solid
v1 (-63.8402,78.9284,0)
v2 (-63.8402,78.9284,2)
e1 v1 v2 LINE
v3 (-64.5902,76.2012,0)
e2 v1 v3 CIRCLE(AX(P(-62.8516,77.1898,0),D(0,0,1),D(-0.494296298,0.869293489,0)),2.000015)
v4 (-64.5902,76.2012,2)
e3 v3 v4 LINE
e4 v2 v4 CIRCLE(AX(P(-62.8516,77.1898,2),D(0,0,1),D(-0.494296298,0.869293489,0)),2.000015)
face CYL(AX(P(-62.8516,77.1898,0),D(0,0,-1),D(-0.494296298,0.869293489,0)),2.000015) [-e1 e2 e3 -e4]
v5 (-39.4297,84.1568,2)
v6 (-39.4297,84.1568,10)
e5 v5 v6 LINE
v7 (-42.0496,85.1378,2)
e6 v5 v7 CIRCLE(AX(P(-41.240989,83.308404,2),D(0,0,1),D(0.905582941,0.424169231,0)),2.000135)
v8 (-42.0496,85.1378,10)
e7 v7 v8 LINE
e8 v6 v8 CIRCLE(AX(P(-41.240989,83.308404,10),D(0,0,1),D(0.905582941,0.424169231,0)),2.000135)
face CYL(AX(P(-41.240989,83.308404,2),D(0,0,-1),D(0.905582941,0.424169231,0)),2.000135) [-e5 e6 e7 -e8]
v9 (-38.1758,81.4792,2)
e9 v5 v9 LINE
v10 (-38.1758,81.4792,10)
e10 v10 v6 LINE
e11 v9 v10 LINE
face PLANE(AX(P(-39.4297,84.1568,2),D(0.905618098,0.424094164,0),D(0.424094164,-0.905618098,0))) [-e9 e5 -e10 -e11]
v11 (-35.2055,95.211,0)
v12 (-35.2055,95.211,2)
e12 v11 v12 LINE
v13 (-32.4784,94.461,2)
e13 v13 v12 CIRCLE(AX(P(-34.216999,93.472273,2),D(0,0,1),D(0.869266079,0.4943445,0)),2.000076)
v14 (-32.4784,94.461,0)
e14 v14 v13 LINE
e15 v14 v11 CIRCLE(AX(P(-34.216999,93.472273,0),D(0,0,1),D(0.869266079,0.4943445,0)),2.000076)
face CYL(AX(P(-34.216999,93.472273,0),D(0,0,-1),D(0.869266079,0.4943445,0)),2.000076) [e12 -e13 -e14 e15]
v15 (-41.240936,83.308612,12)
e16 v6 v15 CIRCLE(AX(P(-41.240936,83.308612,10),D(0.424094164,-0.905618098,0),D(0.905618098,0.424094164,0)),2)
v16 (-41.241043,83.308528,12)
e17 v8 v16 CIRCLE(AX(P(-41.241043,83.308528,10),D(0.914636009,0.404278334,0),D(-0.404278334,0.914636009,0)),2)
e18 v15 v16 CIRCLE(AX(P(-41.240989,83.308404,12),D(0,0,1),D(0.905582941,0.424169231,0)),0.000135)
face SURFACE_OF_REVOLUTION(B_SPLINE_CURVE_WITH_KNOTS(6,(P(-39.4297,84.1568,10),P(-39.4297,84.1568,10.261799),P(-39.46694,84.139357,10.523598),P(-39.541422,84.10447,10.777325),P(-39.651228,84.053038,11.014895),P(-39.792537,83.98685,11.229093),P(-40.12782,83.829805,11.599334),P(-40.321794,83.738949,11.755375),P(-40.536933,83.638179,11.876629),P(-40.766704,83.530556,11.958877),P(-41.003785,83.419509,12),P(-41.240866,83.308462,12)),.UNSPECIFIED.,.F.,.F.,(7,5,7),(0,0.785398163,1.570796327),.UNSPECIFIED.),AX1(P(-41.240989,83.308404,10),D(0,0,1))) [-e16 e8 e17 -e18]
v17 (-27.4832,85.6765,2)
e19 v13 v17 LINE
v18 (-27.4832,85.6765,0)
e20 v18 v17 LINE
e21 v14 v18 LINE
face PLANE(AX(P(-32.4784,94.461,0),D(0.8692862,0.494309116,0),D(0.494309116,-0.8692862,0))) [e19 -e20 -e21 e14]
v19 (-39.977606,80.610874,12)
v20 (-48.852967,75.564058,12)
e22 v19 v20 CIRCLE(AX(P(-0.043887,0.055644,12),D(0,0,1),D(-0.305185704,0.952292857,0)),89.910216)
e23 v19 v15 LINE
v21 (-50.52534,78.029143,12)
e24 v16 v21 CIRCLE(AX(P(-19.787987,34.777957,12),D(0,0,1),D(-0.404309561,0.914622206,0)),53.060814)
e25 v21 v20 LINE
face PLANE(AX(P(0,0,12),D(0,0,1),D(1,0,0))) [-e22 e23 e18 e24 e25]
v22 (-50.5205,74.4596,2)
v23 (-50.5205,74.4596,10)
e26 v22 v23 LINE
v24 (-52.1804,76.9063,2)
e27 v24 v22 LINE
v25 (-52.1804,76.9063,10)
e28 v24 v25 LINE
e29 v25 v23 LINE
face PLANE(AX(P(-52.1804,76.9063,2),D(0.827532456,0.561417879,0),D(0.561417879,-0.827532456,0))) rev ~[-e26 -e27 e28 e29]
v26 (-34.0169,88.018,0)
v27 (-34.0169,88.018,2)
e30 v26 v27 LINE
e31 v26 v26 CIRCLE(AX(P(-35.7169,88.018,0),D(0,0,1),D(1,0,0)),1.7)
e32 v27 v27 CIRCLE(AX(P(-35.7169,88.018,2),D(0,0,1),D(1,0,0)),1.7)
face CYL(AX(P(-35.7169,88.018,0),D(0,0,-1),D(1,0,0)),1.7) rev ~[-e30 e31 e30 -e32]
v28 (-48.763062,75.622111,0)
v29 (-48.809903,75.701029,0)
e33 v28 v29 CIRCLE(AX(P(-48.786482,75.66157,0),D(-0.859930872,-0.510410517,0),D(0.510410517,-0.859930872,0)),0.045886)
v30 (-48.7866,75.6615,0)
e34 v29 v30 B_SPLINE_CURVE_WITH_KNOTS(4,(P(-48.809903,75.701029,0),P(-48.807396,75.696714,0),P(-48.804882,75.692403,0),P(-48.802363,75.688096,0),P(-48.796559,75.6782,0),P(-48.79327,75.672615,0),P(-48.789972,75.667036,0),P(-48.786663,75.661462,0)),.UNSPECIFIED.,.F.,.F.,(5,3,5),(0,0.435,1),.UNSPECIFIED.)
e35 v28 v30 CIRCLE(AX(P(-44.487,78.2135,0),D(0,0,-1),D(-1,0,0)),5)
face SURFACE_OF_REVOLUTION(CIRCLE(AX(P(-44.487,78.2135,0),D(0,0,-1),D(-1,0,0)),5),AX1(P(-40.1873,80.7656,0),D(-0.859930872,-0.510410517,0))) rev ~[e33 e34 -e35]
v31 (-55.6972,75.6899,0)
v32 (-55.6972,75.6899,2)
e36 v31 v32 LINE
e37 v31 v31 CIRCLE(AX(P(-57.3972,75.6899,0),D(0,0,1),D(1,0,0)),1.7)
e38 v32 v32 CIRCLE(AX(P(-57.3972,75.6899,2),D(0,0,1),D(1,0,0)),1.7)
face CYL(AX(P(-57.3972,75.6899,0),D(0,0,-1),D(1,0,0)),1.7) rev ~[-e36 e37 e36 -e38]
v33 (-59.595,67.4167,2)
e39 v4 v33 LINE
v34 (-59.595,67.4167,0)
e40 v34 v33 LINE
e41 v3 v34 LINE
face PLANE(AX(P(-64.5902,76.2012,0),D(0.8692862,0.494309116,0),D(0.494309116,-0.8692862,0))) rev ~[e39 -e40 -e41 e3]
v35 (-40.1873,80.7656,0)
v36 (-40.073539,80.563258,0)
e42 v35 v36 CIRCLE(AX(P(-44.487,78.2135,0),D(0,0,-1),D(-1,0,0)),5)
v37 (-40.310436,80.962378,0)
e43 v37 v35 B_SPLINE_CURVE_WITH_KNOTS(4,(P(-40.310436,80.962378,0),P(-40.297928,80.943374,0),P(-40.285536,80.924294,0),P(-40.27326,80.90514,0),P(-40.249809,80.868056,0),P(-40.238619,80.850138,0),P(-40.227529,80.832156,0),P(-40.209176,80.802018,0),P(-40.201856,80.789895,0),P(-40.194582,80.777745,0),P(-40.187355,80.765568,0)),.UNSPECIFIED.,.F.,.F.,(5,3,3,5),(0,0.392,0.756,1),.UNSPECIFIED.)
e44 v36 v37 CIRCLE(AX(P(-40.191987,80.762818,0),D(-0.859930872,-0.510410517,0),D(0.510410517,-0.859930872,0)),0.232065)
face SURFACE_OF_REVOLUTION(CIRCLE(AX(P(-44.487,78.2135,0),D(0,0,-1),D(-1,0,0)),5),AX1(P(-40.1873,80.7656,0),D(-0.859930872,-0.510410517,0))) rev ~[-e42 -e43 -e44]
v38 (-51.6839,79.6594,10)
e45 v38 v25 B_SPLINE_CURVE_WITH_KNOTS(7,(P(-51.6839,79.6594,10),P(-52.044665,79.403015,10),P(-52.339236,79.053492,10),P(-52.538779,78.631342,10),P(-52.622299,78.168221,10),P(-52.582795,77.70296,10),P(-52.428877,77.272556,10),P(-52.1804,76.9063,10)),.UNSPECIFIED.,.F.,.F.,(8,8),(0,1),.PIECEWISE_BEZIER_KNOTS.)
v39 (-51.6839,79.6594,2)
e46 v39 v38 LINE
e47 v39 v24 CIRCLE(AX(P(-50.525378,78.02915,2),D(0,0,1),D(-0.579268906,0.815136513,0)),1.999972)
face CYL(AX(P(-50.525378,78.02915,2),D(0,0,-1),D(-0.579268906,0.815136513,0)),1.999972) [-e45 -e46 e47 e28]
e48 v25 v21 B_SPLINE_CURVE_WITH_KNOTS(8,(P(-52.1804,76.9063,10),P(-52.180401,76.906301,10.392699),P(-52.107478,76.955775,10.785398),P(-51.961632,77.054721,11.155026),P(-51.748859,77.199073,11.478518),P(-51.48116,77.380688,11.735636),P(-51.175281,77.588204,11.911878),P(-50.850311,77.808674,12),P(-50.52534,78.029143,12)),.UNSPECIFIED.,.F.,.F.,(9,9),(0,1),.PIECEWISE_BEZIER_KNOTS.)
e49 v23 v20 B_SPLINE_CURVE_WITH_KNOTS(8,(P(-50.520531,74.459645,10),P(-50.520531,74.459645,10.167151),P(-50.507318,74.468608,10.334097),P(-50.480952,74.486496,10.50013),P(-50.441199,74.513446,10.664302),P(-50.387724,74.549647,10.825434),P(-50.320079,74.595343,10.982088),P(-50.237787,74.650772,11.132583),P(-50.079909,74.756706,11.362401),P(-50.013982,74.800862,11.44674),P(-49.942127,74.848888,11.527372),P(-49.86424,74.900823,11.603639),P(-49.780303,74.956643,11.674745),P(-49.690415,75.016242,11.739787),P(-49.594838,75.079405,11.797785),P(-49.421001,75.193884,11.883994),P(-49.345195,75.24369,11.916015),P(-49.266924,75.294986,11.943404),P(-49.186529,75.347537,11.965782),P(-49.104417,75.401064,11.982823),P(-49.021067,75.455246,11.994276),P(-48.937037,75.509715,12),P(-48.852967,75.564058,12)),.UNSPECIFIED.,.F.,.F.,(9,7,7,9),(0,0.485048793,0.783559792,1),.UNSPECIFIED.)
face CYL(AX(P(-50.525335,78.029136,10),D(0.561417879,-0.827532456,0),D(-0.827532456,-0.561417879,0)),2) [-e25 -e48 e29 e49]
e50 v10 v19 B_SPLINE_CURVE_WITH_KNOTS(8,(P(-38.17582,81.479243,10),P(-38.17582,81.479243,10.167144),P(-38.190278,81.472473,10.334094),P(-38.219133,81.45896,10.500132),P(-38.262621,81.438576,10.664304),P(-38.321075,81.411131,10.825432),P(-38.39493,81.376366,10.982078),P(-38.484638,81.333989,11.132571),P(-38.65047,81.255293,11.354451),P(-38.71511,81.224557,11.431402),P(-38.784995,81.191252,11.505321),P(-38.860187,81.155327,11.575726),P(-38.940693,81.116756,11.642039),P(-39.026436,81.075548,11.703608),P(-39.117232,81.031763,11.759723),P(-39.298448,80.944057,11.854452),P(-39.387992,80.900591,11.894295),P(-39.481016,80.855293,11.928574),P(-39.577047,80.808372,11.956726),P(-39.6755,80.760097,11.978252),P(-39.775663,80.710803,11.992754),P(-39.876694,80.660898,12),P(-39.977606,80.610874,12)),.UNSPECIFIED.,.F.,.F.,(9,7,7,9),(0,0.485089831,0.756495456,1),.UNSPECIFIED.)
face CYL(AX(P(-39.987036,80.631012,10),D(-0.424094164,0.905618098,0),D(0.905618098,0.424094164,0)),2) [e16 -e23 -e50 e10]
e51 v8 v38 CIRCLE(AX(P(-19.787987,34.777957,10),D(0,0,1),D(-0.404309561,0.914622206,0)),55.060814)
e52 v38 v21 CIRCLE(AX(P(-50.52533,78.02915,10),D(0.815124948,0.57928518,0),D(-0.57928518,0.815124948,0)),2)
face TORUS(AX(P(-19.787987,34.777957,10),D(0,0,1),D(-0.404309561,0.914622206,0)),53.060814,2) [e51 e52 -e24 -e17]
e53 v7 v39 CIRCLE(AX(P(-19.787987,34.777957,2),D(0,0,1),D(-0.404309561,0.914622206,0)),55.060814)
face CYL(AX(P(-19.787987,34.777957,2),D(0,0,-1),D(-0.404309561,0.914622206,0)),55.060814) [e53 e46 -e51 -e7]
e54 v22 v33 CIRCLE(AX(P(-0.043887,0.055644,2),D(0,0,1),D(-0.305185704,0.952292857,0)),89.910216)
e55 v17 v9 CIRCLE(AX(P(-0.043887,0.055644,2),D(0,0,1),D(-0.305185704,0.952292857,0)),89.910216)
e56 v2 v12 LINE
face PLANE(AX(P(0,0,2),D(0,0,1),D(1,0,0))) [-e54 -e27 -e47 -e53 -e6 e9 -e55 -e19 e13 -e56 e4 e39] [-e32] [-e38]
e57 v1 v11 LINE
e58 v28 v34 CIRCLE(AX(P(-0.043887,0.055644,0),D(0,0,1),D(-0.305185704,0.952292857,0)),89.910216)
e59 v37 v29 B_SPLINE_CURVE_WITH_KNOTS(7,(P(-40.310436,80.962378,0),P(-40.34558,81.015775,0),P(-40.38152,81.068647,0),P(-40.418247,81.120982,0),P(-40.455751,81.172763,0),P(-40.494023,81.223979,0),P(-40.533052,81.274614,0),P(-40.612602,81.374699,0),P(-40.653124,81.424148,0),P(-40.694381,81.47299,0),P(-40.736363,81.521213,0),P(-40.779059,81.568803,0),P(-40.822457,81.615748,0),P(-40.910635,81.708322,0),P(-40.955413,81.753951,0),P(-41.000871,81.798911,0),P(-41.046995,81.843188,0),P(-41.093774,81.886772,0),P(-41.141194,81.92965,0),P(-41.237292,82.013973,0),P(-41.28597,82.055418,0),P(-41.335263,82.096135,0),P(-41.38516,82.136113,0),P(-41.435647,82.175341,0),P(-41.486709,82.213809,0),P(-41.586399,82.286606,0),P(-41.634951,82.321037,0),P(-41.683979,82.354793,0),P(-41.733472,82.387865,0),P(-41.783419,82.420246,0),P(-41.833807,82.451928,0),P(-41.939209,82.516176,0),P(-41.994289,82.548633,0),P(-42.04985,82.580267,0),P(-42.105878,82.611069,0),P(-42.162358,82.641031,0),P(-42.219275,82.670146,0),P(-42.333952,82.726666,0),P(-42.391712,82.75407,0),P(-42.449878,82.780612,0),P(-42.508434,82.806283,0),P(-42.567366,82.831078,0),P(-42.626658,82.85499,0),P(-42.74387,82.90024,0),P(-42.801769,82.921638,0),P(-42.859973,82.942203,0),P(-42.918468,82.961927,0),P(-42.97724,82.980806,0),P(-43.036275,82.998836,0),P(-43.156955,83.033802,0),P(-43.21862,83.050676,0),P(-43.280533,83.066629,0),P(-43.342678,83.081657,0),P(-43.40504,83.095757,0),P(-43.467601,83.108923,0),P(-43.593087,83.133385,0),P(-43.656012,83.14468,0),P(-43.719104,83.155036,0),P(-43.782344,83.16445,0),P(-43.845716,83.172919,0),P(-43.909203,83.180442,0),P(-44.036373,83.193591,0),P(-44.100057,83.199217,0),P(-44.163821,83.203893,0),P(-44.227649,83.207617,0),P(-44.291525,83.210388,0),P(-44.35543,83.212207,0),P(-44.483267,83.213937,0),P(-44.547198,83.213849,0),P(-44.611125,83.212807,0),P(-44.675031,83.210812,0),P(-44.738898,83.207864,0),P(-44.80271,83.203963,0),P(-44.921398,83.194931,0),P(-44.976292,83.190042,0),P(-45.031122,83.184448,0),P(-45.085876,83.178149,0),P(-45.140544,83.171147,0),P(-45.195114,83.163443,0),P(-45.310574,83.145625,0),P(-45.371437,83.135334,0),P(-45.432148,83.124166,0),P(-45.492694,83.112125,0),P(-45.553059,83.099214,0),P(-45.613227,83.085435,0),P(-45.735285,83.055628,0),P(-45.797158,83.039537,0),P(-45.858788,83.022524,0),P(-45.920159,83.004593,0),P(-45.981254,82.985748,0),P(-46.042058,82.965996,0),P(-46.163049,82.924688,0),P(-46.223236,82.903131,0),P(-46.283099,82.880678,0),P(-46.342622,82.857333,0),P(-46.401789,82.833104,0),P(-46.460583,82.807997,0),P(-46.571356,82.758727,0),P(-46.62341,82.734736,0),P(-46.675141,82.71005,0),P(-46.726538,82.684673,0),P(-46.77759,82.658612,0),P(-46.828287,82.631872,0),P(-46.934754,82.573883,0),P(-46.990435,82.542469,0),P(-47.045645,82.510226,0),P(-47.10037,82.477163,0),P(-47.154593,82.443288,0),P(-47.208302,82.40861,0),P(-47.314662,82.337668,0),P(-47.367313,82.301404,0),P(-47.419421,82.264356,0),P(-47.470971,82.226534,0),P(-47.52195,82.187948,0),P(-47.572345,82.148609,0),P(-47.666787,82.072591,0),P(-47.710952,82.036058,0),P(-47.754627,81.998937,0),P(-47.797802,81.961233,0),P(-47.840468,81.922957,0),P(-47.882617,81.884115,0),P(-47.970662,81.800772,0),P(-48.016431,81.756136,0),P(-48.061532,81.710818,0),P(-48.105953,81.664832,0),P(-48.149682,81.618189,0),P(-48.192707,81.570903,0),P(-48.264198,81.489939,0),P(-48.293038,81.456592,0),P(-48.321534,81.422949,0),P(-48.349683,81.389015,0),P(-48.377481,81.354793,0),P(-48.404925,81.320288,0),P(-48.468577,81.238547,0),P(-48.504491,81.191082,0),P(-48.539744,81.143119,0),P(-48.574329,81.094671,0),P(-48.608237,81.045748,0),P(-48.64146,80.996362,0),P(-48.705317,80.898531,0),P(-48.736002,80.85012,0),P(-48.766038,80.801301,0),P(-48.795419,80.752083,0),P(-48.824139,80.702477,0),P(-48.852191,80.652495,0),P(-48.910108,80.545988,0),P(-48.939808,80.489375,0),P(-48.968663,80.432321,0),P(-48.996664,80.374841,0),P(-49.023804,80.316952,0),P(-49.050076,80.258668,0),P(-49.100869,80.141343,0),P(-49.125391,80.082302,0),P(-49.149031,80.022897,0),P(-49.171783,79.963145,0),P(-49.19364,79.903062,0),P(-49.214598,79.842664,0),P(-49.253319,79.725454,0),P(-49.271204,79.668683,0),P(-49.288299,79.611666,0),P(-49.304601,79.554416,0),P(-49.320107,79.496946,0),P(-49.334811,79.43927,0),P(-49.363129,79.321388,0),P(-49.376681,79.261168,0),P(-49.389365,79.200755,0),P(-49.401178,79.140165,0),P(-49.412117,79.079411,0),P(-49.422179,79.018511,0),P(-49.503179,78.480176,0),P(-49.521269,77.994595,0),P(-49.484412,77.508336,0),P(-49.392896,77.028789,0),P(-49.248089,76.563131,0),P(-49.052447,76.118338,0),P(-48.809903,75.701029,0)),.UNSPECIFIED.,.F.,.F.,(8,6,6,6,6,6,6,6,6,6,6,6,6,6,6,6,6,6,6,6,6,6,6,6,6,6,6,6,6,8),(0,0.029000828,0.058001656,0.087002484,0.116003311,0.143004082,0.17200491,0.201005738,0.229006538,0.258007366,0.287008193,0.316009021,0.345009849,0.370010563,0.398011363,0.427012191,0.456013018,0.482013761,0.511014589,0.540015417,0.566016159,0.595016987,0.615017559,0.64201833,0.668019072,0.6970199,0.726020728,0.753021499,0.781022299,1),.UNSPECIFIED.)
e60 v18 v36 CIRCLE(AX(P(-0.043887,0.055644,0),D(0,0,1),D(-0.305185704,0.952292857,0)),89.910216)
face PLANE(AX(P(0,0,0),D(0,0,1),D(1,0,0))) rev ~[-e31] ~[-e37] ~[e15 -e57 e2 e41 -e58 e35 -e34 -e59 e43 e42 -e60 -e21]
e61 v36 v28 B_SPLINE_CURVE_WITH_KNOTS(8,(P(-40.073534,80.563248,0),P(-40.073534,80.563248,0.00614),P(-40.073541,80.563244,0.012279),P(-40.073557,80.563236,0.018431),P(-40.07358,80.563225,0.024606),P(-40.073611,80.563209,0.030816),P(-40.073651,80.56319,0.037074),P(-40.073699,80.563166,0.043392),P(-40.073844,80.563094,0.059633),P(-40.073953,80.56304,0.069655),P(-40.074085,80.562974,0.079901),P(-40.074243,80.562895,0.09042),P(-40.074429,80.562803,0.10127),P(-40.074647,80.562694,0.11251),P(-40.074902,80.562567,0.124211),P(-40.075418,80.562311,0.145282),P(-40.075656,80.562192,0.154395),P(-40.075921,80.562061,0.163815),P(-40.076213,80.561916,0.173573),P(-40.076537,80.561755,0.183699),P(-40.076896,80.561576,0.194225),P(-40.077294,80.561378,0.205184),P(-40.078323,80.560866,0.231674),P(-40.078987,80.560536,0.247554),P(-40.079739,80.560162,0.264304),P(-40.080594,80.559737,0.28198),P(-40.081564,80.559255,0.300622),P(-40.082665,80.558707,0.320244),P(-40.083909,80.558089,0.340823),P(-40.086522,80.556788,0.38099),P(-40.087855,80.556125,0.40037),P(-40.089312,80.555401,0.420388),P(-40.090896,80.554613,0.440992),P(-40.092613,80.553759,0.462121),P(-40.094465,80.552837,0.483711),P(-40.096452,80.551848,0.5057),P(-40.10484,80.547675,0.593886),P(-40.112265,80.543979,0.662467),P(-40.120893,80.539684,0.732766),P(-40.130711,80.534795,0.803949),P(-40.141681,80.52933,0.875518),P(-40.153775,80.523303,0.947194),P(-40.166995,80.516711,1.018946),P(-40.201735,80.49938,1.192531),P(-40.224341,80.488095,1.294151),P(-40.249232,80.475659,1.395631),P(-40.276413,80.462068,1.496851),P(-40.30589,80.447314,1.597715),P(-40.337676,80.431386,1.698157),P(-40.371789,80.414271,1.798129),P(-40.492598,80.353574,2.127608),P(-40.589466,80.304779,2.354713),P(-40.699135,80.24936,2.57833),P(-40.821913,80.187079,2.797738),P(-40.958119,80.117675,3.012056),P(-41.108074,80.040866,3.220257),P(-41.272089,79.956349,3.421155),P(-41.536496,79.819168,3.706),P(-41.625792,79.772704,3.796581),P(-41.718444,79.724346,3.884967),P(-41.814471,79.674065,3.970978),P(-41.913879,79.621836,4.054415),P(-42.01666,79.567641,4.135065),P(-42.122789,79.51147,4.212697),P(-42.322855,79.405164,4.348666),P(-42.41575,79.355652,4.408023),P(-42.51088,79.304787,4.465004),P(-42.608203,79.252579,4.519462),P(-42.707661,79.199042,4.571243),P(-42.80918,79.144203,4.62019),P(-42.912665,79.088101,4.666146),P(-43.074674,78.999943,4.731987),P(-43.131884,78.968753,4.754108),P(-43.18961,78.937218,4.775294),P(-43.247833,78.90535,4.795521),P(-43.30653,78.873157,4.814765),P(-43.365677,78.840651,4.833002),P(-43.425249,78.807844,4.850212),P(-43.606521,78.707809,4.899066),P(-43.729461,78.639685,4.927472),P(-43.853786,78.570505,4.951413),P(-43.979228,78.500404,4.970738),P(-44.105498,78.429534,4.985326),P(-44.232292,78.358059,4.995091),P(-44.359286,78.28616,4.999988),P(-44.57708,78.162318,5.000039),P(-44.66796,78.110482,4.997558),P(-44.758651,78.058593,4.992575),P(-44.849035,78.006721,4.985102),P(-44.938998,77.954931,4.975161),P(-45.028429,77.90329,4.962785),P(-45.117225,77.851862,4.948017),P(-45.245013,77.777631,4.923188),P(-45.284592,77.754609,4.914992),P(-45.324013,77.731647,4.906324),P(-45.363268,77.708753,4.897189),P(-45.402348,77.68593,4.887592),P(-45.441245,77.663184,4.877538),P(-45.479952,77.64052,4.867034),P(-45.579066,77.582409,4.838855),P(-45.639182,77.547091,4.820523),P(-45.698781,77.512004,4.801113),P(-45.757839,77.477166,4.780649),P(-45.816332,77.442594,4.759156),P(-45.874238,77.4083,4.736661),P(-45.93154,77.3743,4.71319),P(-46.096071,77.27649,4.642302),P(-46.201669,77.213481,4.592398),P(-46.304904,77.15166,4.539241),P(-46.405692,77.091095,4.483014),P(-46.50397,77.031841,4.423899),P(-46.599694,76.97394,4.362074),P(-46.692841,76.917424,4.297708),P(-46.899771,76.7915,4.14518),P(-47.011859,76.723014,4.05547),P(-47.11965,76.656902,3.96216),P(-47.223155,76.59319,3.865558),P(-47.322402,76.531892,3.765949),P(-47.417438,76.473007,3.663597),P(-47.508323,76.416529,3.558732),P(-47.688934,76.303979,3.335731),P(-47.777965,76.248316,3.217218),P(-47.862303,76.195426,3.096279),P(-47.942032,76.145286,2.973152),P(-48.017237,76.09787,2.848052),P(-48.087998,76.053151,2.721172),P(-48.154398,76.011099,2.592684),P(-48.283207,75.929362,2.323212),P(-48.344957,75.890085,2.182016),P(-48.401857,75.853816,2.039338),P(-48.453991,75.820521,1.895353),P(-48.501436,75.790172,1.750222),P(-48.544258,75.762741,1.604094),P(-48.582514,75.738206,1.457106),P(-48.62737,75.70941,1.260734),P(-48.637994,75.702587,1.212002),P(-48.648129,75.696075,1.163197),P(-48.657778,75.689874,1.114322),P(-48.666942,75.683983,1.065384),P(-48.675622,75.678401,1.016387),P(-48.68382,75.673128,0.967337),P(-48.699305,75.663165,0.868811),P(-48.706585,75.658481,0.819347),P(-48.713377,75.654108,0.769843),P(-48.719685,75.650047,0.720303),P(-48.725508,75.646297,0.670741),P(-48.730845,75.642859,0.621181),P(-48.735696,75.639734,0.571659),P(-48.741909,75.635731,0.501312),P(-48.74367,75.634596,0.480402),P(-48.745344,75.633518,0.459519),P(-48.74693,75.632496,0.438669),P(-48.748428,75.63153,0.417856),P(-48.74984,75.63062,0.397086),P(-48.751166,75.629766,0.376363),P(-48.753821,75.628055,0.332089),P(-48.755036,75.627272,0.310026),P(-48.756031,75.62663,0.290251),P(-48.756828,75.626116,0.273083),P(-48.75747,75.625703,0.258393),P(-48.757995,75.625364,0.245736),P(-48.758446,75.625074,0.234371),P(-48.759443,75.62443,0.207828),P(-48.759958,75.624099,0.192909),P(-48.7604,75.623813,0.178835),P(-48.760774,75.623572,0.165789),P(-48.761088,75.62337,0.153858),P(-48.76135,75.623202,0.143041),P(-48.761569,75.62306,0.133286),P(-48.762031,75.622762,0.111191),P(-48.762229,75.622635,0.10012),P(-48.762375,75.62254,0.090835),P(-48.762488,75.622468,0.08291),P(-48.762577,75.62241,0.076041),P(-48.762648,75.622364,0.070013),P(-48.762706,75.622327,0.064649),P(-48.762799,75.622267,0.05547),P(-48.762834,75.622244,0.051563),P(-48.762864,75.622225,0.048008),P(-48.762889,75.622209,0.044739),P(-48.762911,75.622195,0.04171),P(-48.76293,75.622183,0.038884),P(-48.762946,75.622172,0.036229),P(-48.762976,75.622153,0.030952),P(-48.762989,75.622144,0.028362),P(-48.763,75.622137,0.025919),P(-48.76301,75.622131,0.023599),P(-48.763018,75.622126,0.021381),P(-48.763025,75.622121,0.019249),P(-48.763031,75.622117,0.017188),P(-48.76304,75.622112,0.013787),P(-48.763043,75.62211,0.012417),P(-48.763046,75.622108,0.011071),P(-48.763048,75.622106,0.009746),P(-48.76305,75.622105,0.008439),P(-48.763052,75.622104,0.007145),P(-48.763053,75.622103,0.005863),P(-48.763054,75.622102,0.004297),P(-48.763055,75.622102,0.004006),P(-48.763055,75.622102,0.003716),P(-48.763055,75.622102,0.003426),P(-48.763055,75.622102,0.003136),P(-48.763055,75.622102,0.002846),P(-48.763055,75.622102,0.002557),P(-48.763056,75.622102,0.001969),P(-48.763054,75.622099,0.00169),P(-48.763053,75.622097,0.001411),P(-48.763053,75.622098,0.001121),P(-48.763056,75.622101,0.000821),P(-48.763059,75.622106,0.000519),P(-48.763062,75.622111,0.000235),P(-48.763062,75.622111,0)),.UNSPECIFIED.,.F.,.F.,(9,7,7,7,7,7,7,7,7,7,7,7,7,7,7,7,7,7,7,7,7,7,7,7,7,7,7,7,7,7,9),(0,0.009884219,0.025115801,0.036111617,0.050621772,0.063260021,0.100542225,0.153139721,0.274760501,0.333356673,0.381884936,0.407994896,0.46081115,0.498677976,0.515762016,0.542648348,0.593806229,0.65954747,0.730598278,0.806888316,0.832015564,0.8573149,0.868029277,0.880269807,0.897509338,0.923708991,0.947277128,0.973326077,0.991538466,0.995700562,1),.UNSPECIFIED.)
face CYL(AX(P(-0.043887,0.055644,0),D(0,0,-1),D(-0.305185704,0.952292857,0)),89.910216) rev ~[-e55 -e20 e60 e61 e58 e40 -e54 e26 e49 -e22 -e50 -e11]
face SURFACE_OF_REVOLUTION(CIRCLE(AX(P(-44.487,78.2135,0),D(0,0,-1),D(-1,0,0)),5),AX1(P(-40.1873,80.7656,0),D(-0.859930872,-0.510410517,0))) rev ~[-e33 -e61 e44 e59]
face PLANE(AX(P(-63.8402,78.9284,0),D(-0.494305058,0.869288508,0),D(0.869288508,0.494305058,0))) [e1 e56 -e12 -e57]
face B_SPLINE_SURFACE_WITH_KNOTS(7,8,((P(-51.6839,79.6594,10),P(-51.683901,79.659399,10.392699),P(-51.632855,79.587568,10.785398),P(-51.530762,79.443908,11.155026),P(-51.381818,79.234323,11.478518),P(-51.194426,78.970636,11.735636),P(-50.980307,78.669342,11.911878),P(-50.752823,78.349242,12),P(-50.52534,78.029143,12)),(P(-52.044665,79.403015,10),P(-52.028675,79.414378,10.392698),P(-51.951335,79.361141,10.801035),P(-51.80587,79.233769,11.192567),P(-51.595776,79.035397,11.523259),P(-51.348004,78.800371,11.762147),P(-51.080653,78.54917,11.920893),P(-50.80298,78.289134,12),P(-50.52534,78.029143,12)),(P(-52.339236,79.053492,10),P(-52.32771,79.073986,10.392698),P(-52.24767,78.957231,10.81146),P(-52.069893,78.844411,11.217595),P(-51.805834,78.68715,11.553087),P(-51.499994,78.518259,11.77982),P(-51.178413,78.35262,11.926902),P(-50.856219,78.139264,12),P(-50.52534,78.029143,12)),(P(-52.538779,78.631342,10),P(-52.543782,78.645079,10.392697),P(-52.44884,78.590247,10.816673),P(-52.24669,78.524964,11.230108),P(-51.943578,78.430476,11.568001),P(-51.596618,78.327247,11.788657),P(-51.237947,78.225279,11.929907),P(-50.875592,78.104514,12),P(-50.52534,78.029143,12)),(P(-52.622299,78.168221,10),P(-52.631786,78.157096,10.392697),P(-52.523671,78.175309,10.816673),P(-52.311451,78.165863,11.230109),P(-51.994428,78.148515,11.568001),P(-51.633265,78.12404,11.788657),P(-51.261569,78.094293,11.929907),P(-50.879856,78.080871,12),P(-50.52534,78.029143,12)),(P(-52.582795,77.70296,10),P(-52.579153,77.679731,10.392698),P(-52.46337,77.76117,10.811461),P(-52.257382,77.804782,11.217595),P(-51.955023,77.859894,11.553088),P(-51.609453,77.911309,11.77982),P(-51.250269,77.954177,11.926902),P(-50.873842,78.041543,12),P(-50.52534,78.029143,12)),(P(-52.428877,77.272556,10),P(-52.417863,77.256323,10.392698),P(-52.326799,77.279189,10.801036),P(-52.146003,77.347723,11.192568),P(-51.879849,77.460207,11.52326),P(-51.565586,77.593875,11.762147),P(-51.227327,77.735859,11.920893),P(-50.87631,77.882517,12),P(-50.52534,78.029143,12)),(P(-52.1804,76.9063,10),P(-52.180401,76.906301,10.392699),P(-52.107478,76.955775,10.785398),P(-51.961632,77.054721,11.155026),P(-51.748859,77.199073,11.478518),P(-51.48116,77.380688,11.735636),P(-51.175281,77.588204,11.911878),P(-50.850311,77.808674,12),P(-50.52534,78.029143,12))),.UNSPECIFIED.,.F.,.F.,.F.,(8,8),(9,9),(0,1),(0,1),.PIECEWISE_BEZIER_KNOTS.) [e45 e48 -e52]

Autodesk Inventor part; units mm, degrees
ref_plane "YZ Plane" through (0, 0, 0) normal (1, 0, 0) x (0, 1, 0)
ref_plane "XZ Plane" through (0, 0, 0) normal (0, 1, 0) x (-1, 0, 0)
ref_plane "Work Plane1" through (0, 0, 0) normal (0, 0, 1) x (1, 0, 0)
sketch "Sketch1" plane through (0, 0, 0) normal (0, 0, 1) x (1, 0, 0)
  circle A0 centre (-57.3972, 75.6899) radius 1.7 projected
  circle A1 centre (-35.7169, 88.018) radius 1.7 projected
  line L0 (-64.5902, 76.2012) -> (-59.595, 67.4167)
  line L1 (-32.4784, 94.461) -> (-27.4832, 85.6765)
  line L2 (-63.8402, 78.9284) -> (-35.2055, 95.211)
  circle A2 centre (-57.3972, 75.6899) radius 6 construction
  circle A3 centre (-35.7169, 88.018) radius 6 construction
  arc A4 (-63.8402, 78.9284) -> (-64.5902, 76.2012) centre (-62.8516, 77.1898) ccw
  arc A5 (-32.4784, 94.461) -> (-35.2055, 95.211) centre (-34.2169, 93.4724) ccw
  circle A6 centre (0.0084, -0.0181) radius 121.0993 construction
  line L3 (43.3818, 164.857) -> (-164.4643, 44.857) construction
  line L4 (121.1077, -138.0506) -> (121.1077, 138.0145) construction
  line L5 (-164.4643, -44.8931) -> (43.3818, -164.8931) construction
  circle A7 centre (0.0084, -0.0181) radius 90 construction
  arc A8 (-27.4832, 85.6765) -> (-59.595, 67.4167) centre (-0.044, 0.0559) ccw
  dimension "d4" = 180
  dimension "d0" = 12
  dimension "d1" = 12
  dimension "d2" = 2
extrude "Extrusion1" add sketch "Sketch1" along normal blind 2
sketch "Sketch2" plane through (0, 0, 2) normal (0, 0, 1) x (1, 0, 0)
  circle A0 centre (-35.7169, 88.018) radius 1.7 projected
  circle A1 centre (-57.3972, 75.6899) radius 1.7 projected
  arc A2 (-27.4832, 85.6765) -> (-59.595, 67.4167) centre (-0.044, 0.0559) ccw projected
  line L0 (-35.2055, 95.211) -> (-63.8402, 78.9284) projected
  circle A3 centre (-57.3972, 75.6899) radius 5 construction
  circle A4 centre (-35.7169, 88.018) radius 5 construction
  line L1 (-49.5229, 87.0697) -> (-44.487, 78.2135) construction
  line L2 (-52.1804, 76.9063) -> (-50.5205, 74.4596)
  line L3 (-39.4297, 84.1568) -> (-38.1758, 81.4792)
  arc A5 (-42.0496, 85.1378) -> (-51.6839, 79.6594) centre (-19.7869, 34.7758) ccw
  arc A6 (-38.1758, 81.4792) -> (-50.5205, 74.4596) centre (-0.044, 0.0559) ccw
  arc A7 (-51.6839, 79.6594) -> (-52.1804, 76.9063) centre (-50.5253, 78.0291) ccw
  arc A8 (-39.4297, 84.1568) -> (-42.0496, 85.1378) centre (-41.2409, 83.3085) ccw
  point P0 (0, 0)
  point P1 (-53.2595, 78.4969)
  point P2 (-40.2449, 85.8975)
  dimension "d7" = 10
  dimension "d8" = 10
  dimension "d9" = 2
extrude "Extrusion2" add sketch "Sketch2" along normal blind 10 contours A2 L2 A7 A5 A8 L3
sketch "Sketch3" plane through (0, 0, 0) normal (0, 0, -1) x (-1, 0, 0)
  arc A0 (59.595, 67.4167) -> (27.4832, 85.6765) centre (0.044, 0.0559) ccw projected
  circle A1 centre (44.487, 78.2135) radius 5
  line L0 (40.1873, 80.7656) -> (48.7866, 75.6615)
  point P0 (0, 0)
  dimension "d12" = 10
revolve "Revolution1" cut sketch "Sketch3" angle 360 about axis through (-40.1873, 80.7656, 0) along (-0.8599304, -0.5104113, 0) picked at (45.5743, 75.9819) picked at (48.3072, 75.9308) picked at (41.5919, 79.8659) contours A1 A0 L0 | A0 L0 A1 | A1 L0 A0
fillet "Fillet1" radius 2 5 edges at (-52.4936, 78.3841, 12) (-47.0049, 82.6416, 12) (-40.5396, 85.1815, 12) (-38.8028, 82.818, 12) (-51.3505, 75.6829, 12)
properties part number "glass clamp"
